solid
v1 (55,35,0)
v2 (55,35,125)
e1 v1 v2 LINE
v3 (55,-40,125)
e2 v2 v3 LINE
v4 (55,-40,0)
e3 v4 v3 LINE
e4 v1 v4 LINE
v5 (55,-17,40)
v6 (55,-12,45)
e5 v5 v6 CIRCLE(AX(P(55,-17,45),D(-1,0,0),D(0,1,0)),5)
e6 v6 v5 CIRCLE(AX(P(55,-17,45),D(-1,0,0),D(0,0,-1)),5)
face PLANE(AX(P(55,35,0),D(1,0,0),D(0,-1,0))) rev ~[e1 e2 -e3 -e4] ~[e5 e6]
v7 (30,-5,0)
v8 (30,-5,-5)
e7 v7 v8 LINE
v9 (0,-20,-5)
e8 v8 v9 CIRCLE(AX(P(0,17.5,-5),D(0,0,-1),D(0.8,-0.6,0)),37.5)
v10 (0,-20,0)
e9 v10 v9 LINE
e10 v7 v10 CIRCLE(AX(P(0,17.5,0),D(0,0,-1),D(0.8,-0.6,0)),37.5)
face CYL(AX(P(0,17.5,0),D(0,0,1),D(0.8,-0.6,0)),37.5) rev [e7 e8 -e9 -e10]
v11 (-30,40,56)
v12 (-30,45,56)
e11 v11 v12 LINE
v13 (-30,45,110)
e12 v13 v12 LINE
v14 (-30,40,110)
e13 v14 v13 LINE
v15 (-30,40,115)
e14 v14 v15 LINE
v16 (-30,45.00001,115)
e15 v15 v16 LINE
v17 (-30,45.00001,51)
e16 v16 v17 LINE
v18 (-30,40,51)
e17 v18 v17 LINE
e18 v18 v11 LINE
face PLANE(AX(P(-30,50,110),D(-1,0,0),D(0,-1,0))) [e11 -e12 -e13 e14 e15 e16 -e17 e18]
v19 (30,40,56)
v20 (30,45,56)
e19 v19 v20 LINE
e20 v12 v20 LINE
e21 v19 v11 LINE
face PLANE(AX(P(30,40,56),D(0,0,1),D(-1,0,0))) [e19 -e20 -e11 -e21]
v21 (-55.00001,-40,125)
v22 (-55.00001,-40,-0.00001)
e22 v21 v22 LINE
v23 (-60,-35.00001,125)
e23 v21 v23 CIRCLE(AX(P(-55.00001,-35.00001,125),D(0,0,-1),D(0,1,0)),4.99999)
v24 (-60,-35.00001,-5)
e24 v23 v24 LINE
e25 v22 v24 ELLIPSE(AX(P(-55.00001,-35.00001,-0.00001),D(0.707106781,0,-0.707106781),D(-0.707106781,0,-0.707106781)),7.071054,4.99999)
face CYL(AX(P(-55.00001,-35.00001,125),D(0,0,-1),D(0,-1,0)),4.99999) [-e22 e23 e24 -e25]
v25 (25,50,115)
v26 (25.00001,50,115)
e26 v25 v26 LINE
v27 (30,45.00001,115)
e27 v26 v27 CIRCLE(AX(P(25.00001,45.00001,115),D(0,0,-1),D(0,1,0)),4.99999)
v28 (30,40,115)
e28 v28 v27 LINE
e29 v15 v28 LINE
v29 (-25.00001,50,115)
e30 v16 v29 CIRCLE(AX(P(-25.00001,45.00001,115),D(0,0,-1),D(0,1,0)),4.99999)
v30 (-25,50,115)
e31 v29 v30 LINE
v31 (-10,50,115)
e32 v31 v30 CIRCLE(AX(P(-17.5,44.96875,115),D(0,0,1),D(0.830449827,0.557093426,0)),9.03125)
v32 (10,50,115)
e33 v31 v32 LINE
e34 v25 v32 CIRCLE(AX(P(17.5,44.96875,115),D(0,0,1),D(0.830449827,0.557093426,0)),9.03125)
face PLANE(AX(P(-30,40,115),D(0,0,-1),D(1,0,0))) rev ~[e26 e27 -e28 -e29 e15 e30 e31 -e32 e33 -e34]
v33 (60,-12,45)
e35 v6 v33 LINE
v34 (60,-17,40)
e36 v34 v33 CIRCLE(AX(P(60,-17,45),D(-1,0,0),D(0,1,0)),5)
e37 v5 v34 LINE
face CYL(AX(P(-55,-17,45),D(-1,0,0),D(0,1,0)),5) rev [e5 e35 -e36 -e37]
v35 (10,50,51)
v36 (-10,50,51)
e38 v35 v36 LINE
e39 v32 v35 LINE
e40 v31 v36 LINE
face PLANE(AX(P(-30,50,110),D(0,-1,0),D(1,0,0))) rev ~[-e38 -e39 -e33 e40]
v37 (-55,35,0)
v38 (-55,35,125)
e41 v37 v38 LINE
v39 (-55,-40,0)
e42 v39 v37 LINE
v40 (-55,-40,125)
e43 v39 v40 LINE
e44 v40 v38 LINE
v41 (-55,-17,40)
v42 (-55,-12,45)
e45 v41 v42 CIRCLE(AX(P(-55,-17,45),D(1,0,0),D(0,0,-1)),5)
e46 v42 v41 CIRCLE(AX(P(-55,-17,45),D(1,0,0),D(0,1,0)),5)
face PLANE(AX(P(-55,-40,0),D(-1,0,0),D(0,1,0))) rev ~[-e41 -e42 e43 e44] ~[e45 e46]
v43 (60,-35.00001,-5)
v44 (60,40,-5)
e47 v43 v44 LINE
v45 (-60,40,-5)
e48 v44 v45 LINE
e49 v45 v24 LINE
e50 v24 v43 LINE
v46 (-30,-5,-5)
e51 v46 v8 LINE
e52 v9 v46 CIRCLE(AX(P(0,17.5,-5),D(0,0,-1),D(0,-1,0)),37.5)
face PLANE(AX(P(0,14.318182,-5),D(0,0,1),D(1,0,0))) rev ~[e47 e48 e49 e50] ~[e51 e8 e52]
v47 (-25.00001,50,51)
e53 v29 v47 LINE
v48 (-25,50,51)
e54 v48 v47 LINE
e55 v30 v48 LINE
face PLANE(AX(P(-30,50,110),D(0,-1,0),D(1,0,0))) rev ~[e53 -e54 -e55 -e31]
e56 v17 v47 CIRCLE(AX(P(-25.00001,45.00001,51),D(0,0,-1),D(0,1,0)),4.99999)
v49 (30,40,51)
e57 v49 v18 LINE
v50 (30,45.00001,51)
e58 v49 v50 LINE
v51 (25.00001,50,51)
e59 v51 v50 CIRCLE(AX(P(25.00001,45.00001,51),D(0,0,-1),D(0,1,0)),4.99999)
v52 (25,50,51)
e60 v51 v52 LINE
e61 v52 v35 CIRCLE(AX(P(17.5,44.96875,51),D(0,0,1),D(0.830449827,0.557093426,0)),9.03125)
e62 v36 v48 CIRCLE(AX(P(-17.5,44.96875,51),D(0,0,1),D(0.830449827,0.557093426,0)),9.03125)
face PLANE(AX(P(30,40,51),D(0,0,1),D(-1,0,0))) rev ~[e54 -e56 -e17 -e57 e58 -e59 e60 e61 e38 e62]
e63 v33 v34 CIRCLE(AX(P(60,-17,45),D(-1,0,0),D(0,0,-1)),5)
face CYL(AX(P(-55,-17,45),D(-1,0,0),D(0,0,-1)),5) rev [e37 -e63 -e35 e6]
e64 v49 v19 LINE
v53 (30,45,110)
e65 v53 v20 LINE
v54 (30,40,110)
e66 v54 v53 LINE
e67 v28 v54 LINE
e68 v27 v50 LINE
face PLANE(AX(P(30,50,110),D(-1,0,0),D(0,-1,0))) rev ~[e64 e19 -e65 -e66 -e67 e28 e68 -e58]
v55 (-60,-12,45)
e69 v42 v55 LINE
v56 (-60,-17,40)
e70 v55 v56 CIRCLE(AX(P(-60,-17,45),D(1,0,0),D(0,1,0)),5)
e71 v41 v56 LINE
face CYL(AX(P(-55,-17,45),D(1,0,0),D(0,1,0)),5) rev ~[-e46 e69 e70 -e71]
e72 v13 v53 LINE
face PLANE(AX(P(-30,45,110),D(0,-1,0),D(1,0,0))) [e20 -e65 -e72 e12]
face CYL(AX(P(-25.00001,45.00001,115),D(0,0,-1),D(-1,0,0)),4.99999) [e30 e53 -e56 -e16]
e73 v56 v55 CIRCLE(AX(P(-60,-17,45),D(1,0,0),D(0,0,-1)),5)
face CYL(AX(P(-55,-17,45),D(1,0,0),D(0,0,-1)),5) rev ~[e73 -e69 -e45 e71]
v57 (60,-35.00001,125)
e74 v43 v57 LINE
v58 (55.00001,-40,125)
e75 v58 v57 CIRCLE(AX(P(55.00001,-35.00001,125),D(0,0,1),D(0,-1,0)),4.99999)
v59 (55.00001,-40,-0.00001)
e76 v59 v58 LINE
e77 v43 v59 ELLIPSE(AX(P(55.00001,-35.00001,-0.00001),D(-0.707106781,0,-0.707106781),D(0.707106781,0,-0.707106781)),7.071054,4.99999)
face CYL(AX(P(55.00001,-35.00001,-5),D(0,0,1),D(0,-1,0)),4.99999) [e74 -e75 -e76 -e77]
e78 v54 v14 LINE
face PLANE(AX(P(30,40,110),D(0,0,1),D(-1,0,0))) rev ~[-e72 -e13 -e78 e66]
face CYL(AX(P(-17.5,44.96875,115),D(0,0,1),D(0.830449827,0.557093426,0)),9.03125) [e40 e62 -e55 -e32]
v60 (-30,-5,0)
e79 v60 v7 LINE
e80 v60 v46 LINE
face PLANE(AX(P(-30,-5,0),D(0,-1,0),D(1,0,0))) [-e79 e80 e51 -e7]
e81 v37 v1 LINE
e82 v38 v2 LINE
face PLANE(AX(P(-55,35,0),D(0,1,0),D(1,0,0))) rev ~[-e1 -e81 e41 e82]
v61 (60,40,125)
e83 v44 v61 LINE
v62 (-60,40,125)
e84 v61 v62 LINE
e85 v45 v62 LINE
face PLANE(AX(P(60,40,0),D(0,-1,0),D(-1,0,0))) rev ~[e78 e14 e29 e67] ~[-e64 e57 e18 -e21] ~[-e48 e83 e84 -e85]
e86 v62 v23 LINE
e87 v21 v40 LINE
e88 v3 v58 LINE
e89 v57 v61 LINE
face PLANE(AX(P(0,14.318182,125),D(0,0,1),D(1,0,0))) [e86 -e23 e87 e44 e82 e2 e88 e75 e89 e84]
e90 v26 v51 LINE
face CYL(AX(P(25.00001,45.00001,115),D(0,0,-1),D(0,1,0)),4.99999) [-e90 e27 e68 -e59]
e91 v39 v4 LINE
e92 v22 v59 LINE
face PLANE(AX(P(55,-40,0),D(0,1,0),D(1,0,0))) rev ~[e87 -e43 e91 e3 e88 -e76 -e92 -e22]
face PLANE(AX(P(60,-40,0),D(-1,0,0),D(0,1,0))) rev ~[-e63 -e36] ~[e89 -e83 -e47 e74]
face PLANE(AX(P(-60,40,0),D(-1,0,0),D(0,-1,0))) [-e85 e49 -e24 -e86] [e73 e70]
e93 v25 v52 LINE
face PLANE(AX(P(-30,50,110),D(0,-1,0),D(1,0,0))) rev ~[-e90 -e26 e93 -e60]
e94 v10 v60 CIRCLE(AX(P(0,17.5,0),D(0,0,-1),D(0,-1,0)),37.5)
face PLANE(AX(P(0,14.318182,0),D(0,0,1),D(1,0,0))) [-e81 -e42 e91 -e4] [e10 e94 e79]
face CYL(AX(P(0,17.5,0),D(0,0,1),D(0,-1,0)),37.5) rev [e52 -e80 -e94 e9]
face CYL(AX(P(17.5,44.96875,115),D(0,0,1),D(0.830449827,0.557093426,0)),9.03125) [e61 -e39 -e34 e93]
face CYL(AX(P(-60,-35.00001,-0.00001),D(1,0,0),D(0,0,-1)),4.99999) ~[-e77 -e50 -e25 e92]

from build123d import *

# Parameters (mm, degrees)
F1_DEPTH      = 5
F2_DEPTH      = 125
F4_DEPTH      = 25
F4_DEPTH_BACK = 129
F5_W          = 60
F5_H          = 5
F6_DEPTH      = 10
F7_W          = 60
F7_H          = 5
F8_DEPTH      = 54
F9_R          = 4.99999
F11_DEPTH     = 64


# Not quite as in the source:
# - a fillet or chamfer is up to 0.001 mm smaller than in the source, because OpenCascade refuses the exact size
# - ends of sketch curves that miss each other by under 0.0002 mm in the source are joined


with BuildPart() as f1:
    # F0 (on Top) → F1 (new body)
    with BuildSketch(Plane.XY):
        Polygon((55, -40), (60, -40), (60, 40), (-60, 40), (-60, -40), (-55, -40), (-55, 35), (0, 35), (55, 35), align=None)
        with BuildLine():
            Line((-55, -40), (0, -40))
            Line((0, -40), (0, -20))
            ThreePointArc((0, -20), (-16.7705098312, -16.0410196625), (-30, -5))
            Line((-30, -5), (0, -5))
            Line((0, -5), (0, 35))
            Line((0, 35), (-55, 35))
            Line((-55, 35), (-55, -40))
        make_face()
        with BuildLine():
            Line((0, -40), (55, -40))
            Line((55, -40), (55, 35))
            Line((55, 35), (0, 35))
            Line((0, 35), (0, -5))
            Line((0, -5), (30, -5))
            ThreePointArc((30, -5), (16.7705098312, -16.0410196625), (0, -20))
            Line((0, -20), (0, -40))
        make_face()
    extrude(amount=-F1_DEPTH)

    # F0 (on Top) → F2 (join)
    with BuildSketch(Plane.XY):
        Polygon((55, -40), (60, -40), (60, 40), (-60, 40), (-60, -40), (-55, -40), (-55, 35), (0, 35), (55, 35), align=None)
    extrude(amount=F2_DEPTH)

    # F3 (on face) → F4 (cut, two sides)
    with BuildSketch(Plane.YZ.offset(-55)) as f4_sk:
        with BuildLine():
            Line((-17, 45), (-17, 40))
            ThreePointArc((-17, 40), (-13.4644660941, 41.4644660941), (-12, 45))
            Line((-12, 45), (-17, 45))
        make_face()
        with BuildLine():
            ThreePointArc((-12, 45), (-20.5355339059, 48.5355339059), (-17, 40))
            Line((-17, 40), (-17, 45))
            Line((-17, 45), (-12, 45))
        make_face()
    extrude(amount=-F4_DEPTH, mode=Mode.SUBTRACT)
    extrude(f4_sk.sketch, amount=F4_DEPTH_BACK, mode=Mode.SUBTRACT)

    # F5 (on face) → F6 (join)
    with BuildSketch(Plane(origin=(0, 40, 0), x_dir=(-1, 0, 0), z_dir=(0, 1, 0))):
        Polygon((30, 115), (0, 115), (-30, 115), (-30, 110), (30, 110), align=None)
        with Locations((0, 53.5)):
            Rectangle(F5_W, F5_H)
    extrude(amount=F6_DEPTH)

    # F7 (on face) → F8 (join, through all)
    with BuildSketch(Plane(origin=(0, 0, 110), x_dir=(1, 0, 0), z_dir=(0, 0, -1))):
        with Locations((0, -47.5)):
            Rectangle(F7_W, F7_H)
    extrude(amount=F8_DEPTH)

    # F9 (radius 5 in the source; OpenCascade refuses exactly that, so slightly less here)
    f9_edges = [f1.edges().sort_by_distance(p)[0] for p in [
        (-60, -40, 60),
        (0, -40, -5),
        (60, -40, 60),
        (-30, 50, 83),
        (30, 50, 83),
    ]]
    fillet(f9_edges, radius=F9_R)

    # F10 (on face) → F11 (join, through all)
    with BuildSketch(Plane.XY.offset(115)):
        with BuildLine():
            ThreePointArc((-17.5, 54), (-21.75, 52.9375), (-25, 50))
            Line((-25, 50), (-17.5, 50))
            Line((-17.5, 50), (-17.5, 54))
        make_face()
        with BuildLine():
            Line((-17.5, 54), (-17.5, 50))
            Line((-17.5, 50), (-10, 50))
            ThreePointArc((-10, 50), (-13.25, 52.9375), (-17.5, 54))
        make_face()
        with BuildLine():
            ThreePointArc((25, 50), (17.5, 54), (10, 50))
            Line((10, 50), (25, 50))
        make_face()
    extrude(amount=-F11_DEPTH)


solid = f1.part
